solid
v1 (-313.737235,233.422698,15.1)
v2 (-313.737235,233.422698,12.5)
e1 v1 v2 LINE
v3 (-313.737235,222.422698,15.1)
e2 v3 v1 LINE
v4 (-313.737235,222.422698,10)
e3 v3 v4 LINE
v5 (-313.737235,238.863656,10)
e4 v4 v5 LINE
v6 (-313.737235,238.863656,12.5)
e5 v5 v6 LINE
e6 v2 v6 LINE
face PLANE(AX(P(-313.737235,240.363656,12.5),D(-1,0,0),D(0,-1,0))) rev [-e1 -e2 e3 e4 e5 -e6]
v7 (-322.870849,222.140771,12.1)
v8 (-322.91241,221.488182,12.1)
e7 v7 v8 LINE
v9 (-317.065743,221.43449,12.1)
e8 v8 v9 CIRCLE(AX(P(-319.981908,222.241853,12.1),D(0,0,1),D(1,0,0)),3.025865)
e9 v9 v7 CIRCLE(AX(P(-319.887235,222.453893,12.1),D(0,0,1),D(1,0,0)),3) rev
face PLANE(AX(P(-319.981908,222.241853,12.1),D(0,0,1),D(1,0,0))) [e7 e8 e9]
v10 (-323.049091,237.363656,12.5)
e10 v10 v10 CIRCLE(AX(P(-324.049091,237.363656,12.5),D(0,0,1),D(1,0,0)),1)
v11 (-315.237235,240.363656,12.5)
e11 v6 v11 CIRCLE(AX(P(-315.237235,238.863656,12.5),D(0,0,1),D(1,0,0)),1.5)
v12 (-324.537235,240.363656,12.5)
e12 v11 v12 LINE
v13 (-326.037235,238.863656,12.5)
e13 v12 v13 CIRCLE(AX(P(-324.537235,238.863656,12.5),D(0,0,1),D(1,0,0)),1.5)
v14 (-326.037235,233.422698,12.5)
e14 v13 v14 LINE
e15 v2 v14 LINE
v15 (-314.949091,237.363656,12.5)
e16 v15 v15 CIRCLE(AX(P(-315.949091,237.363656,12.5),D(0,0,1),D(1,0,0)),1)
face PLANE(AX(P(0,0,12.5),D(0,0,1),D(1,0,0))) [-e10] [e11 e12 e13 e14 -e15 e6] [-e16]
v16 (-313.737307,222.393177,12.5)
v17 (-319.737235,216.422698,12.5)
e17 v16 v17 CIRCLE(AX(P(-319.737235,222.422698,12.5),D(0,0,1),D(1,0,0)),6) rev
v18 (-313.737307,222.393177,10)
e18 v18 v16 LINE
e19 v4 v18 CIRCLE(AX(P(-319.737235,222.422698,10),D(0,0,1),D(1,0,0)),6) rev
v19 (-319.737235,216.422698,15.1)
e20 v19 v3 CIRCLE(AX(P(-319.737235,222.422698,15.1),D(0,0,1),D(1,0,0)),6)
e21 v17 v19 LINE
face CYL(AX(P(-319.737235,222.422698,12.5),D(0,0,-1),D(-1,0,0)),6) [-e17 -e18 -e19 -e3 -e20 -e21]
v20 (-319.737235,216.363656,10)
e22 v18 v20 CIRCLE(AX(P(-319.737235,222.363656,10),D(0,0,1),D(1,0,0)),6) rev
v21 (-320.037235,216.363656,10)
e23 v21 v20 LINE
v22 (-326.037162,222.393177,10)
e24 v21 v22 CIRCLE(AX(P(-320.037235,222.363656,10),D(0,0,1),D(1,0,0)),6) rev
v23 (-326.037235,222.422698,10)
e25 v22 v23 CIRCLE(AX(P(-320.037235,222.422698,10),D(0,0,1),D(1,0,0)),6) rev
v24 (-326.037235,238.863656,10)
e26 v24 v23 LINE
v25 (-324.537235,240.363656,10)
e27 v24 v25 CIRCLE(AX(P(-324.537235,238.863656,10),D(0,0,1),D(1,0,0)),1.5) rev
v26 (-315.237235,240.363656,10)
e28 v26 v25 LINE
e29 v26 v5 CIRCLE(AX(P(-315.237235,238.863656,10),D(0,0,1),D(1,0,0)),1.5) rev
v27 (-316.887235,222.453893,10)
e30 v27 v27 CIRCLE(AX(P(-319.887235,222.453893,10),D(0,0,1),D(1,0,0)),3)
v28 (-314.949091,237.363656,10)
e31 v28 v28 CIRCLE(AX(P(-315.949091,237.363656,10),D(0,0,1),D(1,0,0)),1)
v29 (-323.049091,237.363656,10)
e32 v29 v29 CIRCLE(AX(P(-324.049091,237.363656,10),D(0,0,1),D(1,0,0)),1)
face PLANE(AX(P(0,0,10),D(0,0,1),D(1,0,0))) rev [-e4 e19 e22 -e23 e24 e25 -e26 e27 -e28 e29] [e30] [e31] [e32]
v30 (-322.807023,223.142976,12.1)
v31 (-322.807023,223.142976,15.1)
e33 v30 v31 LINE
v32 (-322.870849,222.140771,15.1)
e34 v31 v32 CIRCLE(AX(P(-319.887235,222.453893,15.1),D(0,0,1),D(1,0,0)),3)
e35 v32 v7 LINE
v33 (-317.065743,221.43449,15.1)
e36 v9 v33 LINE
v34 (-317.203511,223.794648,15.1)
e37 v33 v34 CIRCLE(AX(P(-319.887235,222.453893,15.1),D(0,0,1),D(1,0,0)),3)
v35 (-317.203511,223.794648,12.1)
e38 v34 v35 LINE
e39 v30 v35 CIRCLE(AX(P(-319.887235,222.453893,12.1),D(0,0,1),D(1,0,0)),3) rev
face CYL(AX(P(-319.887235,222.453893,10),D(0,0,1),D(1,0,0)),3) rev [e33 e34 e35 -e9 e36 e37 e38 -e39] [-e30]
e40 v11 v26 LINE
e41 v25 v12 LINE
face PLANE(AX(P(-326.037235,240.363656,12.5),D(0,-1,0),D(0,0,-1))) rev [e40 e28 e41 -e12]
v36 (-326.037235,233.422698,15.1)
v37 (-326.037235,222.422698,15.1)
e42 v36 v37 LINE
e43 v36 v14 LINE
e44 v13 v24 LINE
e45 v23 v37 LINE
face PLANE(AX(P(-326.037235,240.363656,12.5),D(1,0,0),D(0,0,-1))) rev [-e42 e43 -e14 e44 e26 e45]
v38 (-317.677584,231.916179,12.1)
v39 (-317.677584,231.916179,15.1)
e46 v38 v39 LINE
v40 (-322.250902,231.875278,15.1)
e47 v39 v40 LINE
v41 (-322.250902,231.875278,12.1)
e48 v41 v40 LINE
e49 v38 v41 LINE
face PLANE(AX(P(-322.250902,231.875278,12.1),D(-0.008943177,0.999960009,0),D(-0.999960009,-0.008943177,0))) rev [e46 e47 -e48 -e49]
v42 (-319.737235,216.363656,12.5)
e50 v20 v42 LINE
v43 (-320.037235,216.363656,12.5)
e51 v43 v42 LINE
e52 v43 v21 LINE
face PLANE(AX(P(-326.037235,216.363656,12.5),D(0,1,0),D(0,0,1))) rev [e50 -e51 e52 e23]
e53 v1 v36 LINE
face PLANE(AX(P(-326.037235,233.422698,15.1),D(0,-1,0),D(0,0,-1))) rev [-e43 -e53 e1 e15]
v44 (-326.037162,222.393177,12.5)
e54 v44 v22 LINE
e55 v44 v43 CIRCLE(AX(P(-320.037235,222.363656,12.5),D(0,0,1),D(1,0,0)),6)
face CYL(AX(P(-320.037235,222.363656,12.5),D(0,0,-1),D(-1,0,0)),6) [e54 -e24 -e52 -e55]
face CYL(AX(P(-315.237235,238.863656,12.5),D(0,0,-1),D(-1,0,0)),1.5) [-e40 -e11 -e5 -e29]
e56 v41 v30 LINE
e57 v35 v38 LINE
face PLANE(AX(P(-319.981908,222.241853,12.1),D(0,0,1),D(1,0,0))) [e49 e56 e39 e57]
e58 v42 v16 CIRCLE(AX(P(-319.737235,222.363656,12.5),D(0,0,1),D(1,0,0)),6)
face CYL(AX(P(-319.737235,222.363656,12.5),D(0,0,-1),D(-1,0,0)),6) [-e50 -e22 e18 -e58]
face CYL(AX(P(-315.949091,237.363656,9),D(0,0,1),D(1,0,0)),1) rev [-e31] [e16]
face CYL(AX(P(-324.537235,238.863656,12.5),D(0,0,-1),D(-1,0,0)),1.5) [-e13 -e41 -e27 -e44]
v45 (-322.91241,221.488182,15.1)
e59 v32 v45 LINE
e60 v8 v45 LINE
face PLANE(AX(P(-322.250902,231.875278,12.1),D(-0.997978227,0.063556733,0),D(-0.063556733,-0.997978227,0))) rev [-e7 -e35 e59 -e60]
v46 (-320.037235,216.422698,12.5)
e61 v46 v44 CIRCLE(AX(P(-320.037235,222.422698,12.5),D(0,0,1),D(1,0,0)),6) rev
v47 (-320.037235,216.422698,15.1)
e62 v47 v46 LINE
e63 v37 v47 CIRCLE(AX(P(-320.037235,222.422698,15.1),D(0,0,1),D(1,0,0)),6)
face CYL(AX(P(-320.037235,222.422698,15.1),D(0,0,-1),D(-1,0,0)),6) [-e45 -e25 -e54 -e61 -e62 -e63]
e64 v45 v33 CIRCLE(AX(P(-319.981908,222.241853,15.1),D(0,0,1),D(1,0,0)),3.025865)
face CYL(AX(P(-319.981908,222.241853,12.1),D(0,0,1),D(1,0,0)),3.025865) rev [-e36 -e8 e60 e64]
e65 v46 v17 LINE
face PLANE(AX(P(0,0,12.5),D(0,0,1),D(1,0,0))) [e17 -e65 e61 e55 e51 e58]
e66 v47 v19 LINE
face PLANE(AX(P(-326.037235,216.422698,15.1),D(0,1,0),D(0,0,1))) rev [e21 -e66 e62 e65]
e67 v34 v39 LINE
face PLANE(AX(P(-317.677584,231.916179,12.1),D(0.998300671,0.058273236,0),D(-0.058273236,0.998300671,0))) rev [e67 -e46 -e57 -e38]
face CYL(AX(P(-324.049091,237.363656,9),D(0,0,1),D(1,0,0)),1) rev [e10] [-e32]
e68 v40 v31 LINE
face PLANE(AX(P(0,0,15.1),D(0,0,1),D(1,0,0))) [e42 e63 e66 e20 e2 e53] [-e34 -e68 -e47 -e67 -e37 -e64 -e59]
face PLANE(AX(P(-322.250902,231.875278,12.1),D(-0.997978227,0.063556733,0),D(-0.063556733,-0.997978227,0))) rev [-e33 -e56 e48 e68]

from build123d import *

# Parameters (mm, degrees)
BOSS_EXTRUDE1_DEPTH = 2.5
FILLET1_R           = 6
FILLET2_R           = 1.5
SKETCH3_R           = 0.9999999999999983
CUT_EXTRUDE1_DEPTH  = 3.5
BOSS_EXTRUDE2_DEPTH = 2.6
SKETCH5_R           = 2.9999999999999947
CUT_EXTRUDE2_DEPTH  = 406.0937861882827
CUT_EXTRUDE3_DEPTH  = 3
FILLET3_R           = 6


with BuildPart() as part:
    # Sketch2 → Boss-Extrude1 (new body)
    with BuildSketch(Plane.XY.offset(10)):
        Polygon((-326.0372348081085, 240.3636560028167), (-313.73723480810855, 240.3636560028167), (-313.7372348081085, 216.3636560028167), (-326.0372348081085, 216.3636560028167), align=None)
    extrude(amount=BOSS_EXTRUDE1_DEPTH)

    # Fillet1
    fillet1_edges = [part.edges().sort_by_distance(p)[0] for p in [
        (-313.7372348081085, 216.3636560028167, 11.25),
        (-326.0372348081085, 216.3636560028167, 11.25),
    ]]
    fillet(fillet1_edges, radius=FILLET1_R)

    # Fillet2
    fillet2_edges = [part.edges().sort_by_distance(p)[0] for p in [
        (-326.0372348081085, 240.3636560028167, 11.25),
        (-313.73723480810855, 240.3636560028167, 11.25),
    ]]
    fillet(fillet2_edges, radius=FILLET2_R)

    # Sketch3 → Cut-Extrude1 (cut)
    with BuildSketch(Plane.XY.offset(12.5)):
        with Locations((-324.0490905957561, 237.3636560028167)):
            Circle(SKETCH3_R)
        with Locations((-315.94909059575616, 237.3636560028167)):
            Circle(SKETCH3_R)
    extrude(amount=-CUT_EXTRUDE1_DEPTH, mode=Mode.SUBTRACT)

    # Sketch4 → Boss-Extrude2 (add)
    with BuildSketch(Plane.XY.offset(12.5)):
        Polygon((-326.0372348081085, 233.42269782366114), (-313.7372348081087, 233.42269782366114), (-313.7372348081086, 216.42269782366117), (-326.0372348081085, 216.42269782366117), align=None)
    extrude(amount=BOSS_EXTRUDE2_DEPTH)

    # Sketch5 → Cut-Extrude2 (cut, through all)
    with BuildSketch(Plane.XY.offset(15.100000000000001)):
        with Locations((-319.88723480810853, 222.45389289856294)):
            Circle(SKETCH5_R)
    extrude(amount=-CUT_EXTRUDE2_DEPTH, mode=Mode.SUBTRACT)

    # Sketch6 → Cut-Extrude3 (cut)
    with BuildSketch(Plane.XY.offset(15.100000000000001)):
        with BuildLine():
            Line((-322.2509023799276, 231.87527778635172), (-317.6775841933858, 231.916179418332))
            Line((-317.6775841933858, 231.916179418332), (-317.06574253676285, 221.43449044480062))
            ThreePointArc((-317.06574253676285, 221.43449044480062), (-320.0096946123076, 219.21611603523496), (-322.9124096628873, 221.4881820948509))
            Line((-322.9124096628873, 221.4881820948509), (-322.2509023799276, 231.87527778635172))
        make_face()
    extrude(amount=-CUT_EXTRUDE3_DEPTH, mode=Mode.SUBTRACT)

    # Fillet3
    # the kernel refuses this fillet: 6 mm, written as the material it takes off along each edge
    with BuildSketch(Plane(origin=(-326.0372348081085, 216.42269782366117, -2.5000000000000018), x_dir=(1, 0, 0), z_dir=(0, 0, 1))) as fillet3_piece_1_section:
        with BuildLine():
            CenterArc((FILLET3_R, FILLET3_R), FILLET3_R, 180, 90)
            Line((0, FILLET3_R), (0, 0))
            Line((0, 0), (FILLET3_R, 0))
        make_face()
    fillet3_piece_1 = extrude(amount=32.6, mode=Mode.PRIVATE)
    fillet3_piece_1 = fillet3_piece_1 - Plane(origin=(-320.0372348081085, 222.3636560028167, 11.24999999999967), x_dir=(0, -1, 0), z_dir=(0, 0, 1)) * Cylinder(6, 90, mode=Mode.PRIVATE)
    add(fillet3_piece_1, mode=Mode.SUBTRACT)
    with BuildSketch(Plane(origin=(-326.0372348081085, 216.42269782366117, 12.5), x_dir=(1, 0, 0), z_dir=(0, 0, 1))) as fillet3_piece_2:
        with BuildLine():
            CenterArc((FILLET3_R, FILLET3_R), FILLET3_R, 180, 90)
            Line((0, FILLET3_R), (0, 0))
            Line((0, 0), (FILLET3_R, 0))
        make_face()
    extrude(amount=17.6, mode=Mode.SUBTRACT)
    with BuildSketch(Plane(origin=(-313.7372348081085, 216.42269782366117, -2.5000000000000018), x_dir=(0, 1, 0), z_dir=(0, 0, 1))) as fillet3_piece_3_section:
        with BuildLine():
            CenterArc((FILLET3_R, FILLET3_R), FILLET3_R, 180, 90)
            Line((0, FILLET3_R), (0, 0))
            Line((0, 0), (FILLET3_R, 0))
        make_face()
    fillet3_piece_3 = extrude(amount=32.6, mode=Mode.PRIVATE)
    fillet3_piece_3 = fillet3_piece_3 - Plane(origin=(-319.7372348081085, 222.3636560028167, 11.250000000000943), x_dir=(1, 2.37e-15, 0), z_dir=(0, 0, 1)) * Cylinder(6, 90, mode=Mode.PRIVATE)
    add(fillet3_piece_3, mode=Mode.SUBTRACT)
    with BuildSketch(Plane(origin=(-313.7372348081086, 216.42269782366117, 12.5), x_dir=(1.895e-14, 1, 0), z_dir=(0, 0, 1))) as fillet3_piece_4:
        with BuildLine():
            CenterArc((FILLET3_R, FILLET3_R), FILLET3_R, 180, 90.00000000000108)
            Line((-1.1369e-13, FILLET3_R), (0, 0))
            Line((0, 0), (FILLET3_R, 0))
        make_face()
    extrude(amount=17.6, mode=Mode.SUBTRACT)


solid = part.part
